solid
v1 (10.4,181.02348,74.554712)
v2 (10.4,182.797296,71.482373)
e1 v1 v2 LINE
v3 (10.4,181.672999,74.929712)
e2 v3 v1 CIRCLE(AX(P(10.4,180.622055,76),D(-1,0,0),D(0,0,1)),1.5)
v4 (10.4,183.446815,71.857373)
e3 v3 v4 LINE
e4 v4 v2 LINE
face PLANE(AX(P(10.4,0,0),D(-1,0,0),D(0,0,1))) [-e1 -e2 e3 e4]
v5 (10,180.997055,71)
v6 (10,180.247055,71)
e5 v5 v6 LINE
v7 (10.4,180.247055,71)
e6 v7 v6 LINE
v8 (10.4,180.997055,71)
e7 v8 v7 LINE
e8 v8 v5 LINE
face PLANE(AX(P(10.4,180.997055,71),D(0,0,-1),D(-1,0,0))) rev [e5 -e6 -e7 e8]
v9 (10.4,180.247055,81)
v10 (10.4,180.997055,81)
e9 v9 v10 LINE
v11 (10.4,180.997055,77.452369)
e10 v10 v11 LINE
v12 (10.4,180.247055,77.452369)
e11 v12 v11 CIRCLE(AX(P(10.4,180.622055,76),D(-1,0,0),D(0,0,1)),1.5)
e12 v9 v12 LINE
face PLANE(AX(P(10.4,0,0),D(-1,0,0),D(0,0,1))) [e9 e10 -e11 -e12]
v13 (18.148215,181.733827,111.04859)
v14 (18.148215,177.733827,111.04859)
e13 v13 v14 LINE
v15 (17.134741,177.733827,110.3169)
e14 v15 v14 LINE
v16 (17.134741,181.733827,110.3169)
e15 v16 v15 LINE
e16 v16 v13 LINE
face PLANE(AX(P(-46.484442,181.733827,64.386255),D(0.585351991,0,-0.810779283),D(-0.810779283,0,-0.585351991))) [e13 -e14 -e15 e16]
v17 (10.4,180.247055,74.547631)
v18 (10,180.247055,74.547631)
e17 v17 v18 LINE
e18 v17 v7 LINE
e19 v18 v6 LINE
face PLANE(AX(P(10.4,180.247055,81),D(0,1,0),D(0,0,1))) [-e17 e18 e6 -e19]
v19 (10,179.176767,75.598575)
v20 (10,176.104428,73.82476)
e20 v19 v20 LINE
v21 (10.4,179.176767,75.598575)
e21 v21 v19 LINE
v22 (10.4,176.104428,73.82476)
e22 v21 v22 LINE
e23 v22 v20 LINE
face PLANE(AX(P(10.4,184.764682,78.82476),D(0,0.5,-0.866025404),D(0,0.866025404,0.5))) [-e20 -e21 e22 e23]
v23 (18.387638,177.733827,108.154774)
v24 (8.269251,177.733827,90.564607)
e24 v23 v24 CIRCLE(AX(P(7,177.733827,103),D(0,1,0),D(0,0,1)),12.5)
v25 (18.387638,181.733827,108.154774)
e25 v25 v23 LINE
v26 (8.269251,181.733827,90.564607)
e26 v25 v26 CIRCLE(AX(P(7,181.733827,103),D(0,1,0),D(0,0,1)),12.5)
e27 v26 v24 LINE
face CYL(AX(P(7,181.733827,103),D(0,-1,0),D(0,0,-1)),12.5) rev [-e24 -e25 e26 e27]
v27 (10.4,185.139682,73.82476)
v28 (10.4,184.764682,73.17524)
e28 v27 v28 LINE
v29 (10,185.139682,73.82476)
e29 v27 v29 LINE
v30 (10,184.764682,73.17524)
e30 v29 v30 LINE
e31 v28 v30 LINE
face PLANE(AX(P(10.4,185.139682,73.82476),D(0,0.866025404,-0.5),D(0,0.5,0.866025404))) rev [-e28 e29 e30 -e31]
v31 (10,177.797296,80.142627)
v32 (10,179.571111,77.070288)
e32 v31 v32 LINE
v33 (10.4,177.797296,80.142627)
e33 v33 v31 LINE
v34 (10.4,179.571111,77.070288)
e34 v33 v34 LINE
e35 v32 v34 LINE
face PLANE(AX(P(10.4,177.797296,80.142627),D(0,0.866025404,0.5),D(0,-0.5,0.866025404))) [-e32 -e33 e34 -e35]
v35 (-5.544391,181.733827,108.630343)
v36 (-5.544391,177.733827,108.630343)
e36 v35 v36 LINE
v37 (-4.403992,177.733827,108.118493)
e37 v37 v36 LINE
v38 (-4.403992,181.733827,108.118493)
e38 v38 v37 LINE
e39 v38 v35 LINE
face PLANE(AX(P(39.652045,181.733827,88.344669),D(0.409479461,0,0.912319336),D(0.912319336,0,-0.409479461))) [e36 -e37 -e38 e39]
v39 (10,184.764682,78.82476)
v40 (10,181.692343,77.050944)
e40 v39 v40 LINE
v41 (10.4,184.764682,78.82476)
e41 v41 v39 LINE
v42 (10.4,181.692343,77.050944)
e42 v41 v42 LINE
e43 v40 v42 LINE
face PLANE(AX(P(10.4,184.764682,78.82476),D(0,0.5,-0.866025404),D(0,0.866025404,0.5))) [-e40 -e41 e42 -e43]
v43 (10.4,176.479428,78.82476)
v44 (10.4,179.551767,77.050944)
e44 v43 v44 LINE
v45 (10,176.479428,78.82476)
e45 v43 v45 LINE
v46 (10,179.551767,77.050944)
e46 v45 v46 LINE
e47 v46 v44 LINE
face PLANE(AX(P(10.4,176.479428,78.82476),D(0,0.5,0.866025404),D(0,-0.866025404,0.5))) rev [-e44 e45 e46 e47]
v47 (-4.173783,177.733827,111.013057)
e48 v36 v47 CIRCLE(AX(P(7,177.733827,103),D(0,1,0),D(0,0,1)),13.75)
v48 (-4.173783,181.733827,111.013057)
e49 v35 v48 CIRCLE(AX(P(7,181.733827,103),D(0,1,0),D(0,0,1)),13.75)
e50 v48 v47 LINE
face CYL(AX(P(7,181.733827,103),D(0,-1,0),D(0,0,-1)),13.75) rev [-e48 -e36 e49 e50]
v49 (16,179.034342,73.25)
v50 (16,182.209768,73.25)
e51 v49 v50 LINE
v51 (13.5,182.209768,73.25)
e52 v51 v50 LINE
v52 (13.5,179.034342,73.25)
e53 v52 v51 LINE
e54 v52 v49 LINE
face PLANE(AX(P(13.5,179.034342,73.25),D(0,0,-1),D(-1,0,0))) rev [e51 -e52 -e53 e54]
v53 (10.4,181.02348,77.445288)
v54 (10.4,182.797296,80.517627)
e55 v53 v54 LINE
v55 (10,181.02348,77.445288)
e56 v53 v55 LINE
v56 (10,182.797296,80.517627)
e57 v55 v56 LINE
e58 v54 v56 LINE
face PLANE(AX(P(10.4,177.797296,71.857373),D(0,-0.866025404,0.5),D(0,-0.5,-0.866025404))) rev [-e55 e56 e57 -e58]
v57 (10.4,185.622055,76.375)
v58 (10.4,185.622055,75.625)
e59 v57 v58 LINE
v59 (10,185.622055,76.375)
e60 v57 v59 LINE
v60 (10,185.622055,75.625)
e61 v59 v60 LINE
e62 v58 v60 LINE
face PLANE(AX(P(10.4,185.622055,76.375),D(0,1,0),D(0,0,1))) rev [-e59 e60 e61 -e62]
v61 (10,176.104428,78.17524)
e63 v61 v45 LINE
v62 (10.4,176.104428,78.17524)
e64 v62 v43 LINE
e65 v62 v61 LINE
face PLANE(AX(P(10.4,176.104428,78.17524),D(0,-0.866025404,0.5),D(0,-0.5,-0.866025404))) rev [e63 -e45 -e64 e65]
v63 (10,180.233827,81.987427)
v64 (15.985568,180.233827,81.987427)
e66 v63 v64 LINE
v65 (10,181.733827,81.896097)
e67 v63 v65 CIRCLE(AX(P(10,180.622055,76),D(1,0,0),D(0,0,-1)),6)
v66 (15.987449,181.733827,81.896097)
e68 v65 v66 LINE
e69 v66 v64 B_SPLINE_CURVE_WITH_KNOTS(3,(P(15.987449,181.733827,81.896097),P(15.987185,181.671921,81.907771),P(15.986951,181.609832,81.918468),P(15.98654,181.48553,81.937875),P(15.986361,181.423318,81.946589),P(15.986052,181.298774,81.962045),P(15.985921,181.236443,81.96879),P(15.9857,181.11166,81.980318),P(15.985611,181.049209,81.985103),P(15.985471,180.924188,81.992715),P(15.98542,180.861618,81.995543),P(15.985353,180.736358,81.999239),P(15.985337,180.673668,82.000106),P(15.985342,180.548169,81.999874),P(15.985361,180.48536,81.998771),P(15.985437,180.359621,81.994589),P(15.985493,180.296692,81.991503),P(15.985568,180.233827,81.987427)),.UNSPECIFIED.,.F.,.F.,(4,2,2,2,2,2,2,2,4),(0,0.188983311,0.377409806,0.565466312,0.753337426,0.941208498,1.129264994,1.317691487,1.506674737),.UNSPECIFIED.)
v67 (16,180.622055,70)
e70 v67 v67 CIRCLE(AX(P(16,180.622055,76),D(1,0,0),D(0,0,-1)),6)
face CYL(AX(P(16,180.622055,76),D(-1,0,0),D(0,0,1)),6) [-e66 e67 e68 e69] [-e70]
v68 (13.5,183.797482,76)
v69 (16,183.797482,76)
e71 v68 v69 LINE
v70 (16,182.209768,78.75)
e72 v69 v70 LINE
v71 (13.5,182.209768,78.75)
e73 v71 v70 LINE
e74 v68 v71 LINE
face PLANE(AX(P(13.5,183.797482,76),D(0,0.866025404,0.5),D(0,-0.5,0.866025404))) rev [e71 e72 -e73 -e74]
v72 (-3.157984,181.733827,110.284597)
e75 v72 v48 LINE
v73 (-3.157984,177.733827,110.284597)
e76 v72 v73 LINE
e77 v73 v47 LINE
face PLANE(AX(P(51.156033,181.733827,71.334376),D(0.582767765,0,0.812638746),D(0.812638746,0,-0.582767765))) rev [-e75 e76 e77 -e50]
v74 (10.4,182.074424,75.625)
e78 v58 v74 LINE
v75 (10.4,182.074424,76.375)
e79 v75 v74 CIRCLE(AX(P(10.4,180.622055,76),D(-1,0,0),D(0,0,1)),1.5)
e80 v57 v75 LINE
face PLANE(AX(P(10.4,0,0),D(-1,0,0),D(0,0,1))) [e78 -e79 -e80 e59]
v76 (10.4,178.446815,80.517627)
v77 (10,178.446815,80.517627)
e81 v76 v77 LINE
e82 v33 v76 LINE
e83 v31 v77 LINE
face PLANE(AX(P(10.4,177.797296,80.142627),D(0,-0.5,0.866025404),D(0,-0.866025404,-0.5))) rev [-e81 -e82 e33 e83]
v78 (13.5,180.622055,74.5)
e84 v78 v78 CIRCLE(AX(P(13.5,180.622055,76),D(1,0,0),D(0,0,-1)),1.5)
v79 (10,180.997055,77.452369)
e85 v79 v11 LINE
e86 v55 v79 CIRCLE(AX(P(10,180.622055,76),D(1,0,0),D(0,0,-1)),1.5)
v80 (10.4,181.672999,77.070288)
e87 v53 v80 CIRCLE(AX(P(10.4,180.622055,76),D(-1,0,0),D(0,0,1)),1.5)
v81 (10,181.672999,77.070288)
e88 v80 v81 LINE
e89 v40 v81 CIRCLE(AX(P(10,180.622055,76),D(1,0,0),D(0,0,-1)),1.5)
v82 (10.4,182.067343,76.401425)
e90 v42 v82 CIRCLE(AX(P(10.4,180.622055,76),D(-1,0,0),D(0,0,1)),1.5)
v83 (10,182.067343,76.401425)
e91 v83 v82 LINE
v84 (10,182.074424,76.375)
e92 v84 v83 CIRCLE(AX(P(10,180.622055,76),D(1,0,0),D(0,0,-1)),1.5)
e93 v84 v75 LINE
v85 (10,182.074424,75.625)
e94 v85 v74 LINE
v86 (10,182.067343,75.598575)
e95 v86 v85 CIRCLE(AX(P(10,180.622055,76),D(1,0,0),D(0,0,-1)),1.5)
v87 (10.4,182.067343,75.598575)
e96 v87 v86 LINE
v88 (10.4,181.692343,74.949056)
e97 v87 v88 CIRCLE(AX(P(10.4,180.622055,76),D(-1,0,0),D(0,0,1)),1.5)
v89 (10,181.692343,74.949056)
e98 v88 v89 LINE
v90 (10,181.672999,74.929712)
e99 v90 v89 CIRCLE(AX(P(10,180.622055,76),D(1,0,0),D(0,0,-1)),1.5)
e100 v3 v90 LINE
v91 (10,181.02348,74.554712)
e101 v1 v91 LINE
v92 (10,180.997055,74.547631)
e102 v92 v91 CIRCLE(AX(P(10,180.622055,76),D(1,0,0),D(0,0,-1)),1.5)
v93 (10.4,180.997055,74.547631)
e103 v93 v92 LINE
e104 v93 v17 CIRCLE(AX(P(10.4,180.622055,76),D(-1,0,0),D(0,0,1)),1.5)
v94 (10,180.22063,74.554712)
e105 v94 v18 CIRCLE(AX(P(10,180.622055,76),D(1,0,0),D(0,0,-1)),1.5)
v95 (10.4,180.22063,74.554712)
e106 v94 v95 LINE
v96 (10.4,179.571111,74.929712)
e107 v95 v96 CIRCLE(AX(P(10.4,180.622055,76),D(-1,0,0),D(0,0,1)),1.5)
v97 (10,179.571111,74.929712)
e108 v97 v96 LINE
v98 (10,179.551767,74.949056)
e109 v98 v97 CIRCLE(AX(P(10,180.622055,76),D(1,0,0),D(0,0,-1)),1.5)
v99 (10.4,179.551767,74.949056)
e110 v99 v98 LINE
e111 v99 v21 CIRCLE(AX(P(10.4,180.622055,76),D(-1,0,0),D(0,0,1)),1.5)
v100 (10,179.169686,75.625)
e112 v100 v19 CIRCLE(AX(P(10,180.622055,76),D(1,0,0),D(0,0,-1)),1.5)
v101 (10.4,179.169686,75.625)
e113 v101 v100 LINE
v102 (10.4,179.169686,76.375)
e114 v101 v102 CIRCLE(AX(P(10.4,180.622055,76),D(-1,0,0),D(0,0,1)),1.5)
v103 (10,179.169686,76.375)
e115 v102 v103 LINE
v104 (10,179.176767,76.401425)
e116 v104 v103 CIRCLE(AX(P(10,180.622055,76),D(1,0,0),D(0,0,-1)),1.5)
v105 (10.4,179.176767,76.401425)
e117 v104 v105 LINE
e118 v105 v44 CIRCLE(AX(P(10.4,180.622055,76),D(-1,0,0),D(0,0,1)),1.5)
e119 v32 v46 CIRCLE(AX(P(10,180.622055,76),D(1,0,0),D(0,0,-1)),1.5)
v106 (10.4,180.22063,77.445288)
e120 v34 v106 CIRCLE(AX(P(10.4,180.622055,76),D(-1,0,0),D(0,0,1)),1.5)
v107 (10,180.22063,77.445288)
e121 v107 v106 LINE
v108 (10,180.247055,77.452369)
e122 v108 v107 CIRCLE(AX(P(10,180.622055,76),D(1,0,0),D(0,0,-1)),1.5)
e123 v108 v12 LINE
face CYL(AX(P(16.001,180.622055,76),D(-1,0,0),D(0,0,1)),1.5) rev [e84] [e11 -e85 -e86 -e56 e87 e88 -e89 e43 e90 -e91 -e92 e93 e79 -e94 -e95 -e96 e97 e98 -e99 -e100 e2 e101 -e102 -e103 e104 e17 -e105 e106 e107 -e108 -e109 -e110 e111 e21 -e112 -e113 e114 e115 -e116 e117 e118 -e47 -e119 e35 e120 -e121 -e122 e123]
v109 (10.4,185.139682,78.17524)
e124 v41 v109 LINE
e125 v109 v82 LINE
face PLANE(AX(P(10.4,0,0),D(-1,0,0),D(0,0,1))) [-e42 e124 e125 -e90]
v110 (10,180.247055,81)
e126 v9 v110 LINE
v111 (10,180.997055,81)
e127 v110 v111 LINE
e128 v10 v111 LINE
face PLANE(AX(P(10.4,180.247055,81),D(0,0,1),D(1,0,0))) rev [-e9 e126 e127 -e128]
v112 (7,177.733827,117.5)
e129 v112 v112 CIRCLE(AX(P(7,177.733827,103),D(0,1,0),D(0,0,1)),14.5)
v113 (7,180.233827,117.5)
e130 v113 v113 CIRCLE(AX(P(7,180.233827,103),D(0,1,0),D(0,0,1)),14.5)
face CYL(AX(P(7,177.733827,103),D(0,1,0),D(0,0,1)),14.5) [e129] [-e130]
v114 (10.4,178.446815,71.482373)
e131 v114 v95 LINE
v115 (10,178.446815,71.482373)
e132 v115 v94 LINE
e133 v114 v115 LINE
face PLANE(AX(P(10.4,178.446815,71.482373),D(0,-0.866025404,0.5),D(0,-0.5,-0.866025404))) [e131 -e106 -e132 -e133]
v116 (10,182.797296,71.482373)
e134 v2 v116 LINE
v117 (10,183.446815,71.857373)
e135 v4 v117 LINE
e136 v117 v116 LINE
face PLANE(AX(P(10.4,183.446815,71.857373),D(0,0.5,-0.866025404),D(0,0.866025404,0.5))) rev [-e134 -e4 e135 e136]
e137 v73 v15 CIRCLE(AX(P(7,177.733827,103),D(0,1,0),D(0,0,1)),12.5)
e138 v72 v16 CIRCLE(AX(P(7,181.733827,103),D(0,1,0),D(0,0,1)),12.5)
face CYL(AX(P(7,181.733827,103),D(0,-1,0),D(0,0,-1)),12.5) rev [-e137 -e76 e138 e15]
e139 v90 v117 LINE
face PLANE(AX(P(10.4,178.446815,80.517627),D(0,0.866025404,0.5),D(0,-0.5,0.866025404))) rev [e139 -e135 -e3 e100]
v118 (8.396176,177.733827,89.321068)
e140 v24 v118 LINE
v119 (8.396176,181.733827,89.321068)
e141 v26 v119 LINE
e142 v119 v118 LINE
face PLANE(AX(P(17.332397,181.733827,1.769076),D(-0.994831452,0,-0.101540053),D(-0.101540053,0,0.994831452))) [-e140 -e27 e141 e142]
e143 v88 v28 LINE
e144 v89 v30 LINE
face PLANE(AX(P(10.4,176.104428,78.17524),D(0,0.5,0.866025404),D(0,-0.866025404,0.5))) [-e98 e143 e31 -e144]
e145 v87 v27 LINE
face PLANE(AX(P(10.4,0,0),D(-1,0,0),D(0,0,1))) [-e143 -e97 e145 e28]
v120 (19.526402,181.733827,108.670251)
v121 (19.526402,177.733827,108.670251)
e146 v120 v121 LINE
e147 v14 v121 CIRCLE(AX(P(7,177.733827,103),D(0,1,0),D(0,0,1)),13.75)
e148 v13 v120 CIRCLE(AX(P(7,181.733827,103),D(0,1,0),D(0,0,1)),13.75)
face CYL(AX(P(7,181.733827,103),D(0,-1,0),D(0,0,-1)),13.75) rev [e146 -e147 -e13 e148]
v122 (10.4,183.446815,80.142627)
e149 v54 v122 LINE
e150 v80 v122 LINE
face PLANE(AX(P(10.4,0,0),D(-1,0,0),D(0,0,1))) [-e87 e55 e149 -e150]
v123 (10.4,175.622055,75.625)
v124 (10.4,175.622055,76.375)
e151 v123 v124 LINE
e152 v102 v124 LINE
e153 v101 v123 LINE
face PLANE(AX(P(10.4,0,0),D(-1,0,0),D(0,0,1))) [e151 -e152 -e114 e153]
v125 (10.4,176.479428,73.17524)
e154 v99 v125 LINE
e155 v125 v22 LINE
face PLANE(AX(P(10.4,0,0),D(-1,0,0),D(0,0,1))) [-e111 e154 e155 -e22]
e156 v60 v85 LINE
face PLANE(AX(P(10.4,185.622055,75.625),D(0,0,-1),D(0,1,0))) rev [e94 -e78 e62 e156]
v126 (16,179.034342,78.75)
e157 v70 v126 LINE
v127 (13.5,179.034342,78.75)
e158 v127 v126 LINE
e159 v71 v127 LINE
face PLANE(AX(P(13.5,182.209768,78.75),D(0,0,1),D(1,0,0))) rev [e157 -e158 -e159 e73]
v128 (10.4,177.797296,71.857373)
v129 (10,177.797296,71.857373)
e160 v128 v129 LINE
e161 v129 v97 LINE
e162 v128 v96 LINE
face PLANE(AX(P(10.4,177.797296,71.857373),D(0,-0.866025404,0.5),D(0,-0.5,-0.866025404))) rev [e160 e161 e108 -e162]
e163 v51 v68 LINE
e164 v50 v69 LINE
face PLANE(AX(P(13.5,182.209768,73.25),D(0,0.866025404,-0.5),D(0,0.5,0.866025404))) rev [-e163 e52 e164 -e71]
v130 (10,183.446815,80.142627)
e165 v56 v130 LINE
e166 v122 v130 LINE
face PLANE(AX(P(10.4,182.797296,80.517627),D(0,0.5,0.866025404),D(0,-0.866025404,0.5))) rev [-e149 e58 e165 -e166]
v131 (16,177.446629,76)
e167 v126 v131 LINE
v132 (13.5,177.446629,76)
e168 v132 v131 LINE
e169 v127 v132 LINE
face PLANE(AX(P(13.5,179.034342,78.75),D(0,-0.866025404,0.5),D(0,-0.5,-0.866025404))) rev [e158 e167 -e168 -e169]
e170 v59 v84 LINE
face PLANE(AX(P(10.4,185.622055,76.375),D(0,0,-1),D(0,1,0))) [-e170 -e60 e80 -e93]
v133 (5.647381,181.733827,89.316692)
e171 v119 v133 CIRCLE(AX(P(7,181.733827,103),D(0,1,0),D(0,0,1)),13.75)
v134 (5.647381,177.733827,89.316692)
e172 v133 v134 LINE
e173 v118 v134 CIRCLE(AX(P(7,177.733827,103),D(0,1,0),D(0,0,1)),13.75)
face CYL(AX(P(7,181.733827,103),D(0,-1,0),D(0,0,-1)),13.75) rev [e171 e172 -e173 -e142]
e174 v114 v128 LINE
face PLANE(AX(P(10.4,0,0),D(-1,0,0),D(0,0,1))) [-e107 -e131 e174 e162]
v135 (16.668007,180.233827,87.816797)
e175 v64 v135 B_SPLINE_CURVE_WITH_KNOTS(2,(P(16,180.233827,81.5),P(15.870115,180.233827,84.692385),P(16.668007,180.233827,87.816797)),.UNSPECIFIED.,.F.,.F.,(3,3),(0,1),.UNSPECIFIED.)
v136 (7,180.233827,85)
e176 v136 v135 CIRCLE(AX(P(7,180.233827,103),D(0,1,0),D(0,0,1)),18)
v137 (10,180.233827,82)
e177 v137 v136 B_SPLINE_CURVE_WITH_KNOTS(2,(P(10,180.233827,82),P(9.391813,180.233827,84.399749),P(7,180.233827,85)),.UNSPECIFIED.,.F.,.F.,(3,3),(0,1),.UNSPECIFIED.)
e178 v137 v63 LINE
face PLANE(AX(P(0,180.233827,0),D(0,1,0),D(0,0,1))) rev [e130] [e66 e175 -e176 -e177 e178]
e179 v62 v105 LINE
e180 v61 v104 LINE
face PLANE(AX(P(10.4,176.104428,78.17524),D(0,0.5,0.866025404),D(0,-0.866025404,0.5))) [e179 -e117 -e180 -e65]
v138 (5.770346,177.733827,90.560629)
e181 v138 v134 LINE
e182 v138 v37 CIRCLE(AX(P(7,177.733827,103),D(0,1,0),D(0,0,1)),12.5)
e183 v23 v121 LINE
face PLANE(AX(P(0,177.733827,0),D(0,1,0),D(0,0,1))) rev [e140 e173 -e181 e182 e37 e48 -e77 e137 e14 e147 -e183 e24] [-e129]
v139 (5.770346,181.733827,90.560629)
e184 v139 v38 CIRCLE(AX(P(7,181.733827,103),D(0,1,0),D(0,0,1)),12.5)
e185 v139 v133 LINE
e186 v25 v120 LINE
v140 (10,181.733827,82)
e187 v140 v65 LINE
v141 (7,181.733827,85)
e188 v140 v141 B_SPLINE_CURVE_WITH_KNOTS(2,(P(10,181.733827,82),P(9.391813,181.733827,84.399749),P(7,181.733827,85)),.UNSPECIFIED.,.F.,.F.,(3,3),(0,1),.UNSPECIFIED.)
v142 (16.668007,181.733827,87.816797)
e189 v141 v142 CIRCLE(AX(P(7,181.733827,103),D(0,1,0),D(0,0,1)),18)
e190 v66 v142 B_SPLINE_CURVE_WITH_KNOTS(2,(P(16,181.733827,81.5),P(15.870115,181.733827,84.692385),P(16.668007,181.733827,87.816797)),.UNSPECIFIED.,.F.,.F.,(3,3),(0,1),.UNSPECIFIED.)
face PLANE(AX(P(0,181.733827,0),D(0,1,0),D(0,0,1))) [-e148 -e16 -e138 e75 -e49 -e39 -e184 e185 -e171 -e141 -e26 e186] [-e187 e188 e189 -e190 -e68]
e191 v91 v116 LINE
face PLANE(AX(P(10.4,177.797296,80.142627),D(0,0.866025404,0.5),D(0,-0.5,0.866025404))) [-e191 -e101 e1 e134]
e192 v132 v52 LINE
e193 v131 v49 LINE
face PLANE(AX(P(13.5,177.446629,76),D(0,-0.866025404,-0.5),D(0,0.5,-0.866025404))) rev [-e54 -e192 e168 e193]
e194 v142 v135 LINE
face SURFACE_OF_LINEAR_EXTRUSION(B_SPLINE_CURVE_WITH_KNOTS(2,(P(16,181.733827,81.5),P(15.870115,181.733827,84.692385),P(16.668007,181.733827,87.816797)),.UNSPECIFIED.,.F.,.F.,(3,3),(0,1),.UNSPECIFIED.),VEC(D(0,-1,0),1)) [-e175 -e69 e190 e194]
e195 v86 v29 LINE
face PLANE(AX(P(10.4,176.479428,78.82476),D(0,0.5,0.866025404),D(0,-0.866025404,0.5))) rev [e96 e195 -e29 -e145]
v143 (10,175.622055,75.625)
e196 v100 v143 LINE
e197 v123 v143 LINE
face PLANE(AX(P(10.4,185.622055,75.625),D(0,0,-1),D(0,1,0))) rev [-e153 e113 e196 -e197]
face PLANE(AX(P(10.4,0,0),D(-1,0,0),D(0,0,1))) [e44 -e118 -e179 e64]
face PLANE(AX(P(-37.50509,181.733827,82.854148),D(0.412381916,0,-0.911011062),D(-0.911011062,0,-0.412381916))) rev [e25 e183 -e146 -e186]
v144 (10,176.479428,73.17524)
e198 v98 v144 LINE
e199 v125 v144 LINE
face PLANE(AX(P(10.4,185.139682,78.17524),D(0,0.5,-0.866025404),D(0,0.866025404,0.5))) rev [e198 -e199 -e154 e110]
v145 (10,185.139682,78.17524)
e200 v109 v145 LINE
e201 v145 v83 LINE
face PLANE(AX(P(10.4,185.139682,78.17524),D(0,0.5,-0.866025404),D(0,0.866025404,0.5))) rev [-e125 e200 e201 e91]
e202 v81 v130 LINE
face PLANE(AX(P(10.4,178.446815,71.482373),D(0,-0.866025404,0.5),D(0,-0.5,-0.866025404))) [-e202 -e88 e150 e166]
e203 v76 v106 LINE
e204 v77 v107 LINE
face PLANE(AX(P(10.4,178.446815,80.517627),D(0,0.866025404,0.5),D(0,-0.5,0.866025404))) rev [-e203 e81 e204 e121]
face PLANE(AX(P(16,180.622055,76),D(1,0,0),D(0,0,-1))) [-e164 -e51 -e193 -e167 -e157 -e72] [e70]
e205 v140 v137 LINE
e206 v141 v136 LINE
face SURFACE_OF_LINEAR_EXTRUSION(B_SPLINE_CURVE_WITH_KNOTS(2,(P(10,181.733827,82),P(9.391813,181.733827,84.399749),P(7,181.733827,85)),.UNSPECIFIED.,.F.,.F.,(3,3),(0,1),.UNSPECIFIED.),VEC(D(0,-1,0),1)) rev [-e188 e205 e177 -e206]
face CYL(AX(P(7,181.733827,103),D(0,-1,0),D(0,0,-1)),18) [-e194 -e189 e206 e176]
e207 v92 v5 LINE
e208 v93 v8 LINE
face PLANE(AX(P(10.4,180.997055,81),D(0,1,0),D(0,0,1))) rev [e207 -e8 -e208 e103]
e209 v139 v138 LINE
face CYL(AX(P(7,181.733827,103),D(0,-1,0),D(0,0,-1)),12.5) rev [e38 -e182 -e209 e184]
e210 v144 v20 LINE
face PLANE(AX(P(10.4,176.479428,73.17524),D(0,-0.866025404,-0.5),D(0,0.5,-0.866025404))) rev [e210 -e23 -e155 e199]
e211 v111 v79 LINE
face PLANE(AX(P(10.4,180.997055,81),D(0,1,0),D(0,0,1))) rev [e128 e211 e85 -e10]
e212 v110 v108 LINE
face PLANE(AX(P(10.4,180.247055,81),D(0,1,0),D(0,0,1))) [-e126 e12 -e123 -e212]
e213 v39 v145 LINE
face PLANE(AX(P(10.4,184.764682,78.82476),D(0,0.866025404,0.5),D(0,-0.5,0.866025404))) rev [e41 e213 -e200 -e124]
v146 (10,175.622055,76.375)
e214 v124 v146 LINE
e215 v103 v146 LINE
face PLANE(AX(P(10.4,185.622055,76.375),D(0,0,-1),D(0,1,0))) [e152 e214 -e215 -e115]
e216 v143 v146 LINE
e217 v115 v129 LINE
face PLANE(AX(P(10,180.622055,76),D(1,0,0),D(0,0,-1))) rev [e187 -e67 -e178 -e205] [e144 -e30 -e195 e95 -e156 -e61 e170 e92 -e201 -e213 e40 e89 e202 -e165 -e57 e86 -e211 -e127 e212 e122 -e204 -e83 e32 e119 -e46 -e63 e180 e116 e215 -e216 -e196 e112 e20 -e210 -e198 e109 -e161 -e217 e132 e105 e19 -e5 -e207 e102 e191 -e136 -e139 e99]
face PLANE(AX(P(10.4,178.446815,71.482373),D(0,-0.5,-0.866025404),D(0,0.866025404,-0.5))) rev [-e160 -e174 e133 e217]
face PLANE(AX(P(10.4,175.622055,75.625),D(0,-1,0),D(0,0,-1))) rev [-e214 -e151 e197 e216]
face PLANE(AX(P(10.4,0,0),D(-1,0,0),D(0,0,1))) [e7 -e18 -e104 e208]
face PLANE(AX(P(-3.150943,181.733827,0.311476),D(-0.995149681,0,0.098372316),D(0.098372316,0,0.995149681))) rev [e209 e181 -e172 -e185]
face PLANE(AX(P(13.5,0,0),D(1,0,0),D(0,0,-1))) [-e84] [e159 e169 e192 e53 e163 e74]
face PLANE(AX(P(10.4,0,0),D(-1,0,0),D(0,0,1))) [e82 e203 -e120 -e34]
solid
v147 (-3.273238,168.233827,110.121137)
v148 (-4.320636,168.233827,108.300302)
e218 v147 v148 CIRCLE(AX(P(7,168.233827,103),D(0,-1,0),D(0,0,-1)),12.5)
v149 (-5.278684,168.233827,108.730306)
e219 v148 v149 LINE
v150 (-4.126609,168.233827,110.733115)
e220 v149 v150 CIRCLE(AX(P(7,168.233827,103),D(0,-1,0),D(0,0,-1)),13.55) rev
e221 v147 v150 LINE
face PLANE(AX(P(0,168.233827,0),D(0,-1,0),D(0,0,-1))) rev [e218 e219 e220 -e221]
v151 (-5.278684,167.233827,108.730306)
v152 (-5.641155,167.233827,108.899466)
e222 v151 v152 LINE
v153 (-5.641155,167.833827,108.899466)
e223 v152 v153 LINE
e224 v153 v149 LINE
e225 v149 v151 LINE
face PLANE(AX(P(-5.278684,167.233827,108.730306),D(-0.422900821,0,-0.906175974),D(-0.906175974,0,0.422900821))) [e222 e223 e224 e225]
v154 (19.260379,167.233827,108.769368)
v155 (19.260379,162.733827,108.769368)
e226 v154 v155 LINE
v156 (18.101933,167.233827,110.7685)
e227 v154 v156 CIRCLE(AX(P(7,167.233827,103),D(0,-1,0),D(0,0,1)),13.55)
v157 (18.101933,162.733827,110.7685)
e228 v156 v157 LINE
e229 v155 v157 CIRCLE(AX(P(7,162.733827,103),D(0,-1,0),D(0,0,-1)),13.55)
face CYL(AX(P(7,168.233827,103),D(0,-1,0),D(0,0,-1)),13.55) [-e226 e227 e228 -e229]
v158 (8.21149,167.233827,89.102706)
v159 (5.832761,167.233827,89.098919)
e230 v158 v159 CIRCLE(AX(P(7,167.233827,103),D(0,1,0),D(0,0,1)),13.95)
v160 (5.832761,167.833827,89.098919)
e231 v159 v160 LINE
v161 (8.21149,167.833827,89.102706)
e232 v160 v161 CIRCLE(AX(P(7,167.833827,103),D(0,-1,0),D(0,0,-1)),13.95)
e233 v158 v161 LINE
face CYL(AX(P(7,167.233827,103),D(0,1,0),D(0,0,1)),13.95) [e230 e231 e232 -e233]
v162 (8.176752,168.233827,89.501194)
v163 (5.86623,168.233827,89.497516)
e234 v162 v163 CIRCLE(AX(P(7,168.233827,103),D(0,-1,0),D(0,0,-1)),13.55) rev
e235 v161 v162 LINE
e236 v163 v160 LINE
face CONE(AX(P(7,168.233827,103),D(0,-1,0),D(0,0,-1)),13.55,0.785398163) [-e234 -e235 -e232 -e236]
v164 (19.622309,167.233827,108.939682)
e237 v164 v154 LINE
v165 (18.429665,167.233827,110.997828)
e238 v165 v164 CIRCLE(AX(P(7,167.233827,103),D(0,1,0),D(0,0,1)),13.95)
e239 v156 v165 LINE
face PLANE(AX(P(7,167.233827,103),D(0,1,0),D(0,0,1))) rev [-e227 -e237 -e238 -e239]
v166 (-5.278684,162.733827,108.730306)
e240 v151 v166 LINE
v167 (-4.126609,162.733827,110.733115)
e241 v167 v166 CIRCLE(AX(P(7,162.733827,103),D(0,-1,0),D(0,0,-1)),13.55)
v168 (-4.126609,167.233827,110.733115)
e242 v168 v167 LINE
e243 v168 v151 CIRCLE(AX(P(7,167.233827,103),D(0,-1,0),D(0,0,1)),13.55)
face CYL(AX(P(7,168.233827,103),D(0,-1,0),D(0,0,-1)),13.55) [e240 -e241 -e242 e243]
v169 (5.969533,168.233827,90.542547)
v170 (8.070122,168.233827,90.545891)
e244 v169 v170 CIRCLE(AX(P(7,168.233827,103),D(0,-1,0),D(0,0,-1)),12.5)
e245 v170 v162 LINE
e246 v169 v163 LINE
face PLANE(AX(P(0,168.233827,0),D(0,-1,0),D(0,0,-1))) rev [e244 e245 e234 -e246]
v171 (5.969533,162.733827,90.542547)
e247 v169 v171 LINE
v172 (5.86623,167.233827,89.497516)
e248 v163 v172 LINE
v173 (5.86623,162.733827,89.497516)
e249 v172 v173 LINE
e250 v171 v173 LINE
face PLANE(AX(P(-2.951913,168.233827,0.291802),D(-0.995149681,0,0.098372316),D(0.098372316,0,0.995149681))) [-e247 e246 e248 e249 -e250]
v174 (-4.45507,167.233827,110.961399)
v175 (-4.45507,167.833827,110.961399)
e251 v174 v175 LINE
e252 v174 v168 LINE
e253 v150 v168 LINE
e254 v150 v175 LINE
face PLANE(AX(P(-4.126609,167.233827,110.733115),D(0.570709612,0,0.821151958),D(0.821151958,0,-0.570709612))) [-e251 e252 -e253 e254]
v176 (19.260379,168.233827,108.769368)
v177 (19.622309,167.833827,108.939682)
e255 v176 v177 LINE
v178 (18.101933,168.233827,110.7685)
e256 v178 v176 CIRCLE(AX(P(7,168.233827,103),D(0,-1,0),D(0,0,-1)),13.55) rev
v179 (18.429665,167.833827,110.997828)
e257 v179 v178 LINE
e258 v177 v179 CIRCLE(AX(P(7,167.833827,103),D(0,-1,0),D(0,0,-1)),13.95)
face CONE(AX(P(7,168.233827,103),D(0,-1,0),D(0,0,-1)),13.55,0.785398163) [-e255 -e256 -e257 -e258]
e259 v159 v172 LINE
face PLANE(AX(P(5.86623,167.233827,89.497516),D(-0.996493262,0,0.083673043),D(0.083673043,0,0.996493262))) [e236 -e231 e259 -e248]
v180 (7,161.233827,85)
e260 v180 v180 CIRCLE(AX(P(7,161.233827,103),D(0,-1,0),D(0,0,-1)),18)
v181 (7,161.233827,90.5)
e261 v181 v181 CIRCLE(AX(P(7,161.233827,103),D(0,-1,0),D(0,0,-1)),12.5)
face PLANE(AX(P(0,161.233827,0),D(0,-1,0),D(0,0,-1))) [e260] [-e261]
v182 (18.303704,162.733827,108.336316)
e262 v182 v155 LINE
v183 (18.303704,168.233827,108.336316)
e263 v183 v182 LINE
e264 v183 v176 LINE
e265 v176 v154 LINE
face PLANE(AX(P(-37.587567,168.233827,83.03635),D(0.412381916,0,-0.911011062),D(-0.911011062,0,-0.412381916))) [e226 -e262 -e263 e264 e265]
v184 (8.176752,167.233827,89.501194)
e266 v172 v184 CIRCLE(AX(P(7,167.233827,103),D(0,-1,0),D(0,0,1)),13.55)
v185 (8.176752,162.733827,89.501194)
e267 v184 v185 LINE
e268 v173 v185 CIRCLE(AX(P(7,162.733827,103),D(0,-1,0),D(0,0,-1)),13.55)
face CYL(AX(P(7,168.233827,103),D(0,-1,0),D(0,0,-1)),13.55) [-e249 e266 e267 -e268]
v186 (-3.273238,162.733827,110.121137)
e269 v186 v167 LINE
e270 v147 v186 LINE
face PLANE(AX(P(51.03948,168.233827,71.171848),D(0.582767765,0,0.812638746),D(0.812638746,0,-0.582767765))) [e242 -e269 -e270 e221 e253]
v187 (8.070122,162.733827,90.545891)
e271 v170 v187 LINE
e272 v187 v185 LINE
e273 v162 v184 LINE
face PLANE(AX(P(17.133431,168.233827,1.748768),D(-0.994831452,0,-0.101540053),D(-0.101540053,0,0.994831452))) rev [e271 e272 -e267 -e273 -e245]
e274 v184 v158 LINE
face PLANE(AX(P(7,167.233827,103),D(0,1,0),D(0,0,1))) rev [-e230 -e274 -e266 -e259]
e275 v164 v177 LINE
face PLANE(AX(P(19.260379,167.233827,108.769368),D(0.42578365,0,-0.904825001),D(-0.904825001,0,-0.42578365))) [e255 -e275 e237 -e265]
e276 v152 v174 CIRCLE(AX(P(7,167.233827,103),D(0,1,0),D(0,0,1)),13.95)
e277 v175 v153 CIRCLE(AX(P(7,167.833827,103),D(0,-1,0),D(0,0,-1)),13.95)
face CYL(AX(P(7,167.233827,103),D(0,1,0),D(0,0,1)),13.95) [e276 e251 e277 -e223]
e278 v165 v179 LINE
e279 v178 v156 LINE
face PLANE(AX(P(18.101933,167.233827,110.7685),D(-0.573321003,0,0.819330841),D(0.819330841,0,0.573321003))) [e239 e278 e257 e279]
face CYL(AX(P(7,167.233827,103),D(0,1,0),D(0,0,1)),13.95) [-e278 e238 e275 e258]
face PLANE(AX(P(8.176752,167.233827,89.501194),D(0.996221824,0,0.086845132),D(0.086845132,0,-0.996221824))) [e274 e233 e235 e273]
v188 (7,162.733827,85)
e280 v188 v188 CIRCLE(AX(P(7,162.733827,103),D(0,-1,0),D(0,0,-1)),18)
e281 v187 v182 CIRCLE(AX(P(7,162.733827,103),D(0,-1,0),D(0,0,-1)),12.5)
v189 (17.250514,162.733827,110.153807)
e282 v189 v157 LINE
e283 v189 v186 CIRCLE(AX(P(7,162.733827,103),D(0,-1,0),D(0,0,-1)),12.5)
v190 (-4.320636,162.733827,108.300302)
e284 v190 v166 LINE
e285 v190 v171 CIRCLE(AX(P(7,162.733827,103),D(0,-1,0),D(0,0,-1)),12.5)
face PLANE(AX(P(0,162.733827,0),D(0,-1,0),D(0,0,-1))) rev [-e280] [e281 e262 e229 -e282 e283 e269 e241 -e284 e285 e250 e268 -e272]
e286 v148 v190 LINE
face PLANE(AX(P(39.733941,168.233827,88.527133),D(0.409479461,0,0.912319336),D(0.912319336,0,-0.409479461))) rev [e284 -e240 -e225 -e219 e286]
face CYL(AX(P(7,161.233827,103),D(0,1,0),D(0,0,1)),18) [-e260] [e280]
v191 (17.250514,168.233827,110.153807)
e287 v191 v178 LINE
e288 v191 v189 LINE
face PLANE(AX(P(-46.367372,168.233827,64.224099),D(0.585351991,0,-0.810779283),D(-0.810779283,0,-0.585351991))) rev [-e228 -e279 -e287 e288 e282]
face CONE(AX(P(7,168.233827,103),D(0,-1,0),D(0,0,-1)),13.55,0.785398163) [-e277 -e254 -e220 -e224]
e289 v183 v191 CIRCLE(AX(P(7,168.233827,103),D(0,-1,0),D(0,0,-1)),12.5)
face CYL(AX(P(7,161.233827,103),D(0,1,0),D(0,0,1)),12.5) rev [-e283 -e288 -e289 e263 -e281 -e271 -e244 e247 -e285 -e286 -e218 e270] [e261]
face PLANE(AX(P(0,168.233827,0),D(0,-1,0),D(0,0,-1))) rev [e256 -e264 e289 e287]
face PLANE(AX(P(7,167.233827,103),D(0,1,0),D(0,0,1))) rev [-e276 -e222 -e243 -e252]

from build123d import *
from build123d.topology import SkipClean

# Parameters (mm, degrees)
ESBO_O120_R                = 6
RESSALTO_EXTRUS_O39_DEPTH  = 6
ESBO_O120_3_W              = 10
ESBO_O120_3_H              = 0.75
ESBO_O120_3_W_2            = 0.75
ESBO_O120_3_H_2            = 10
CORTE_EXTRUS_O_FINA1_DEPTH = 0.4
CORTE_EXTRUS_O49_REACH     = 205.931
ESBO_O120_4_R              = 1.5
CORTE_EXTRUS_O50_DEPTH     = 2.5
RESSALTO_EXTRUS_O40_DEPTH  = 1.5
RESSALTO_EXTRUS_O41_START  = -2.5
ESBO_O122_12_R             = 14.5
RESSALTO_EXTRUS_O41_DEPTH  = 2.5
ESBO_O123_R                = 18
ESBO_O123_R_2              = 12.5
RESSALTO_EXTRUS_O42_DEPTH  = 1.5
RESSALTO_EXTRUS_O43_DEPTH  = 5.5
RESSALTO_EXTRUS_O44_DEPTH  = 1
CHANFRO1_SIZE              = 0.4


with BuildPart() as part:
    # Esboço120 → Ressalto-extrusão39 (new body)
    with BuildSketch(Plane(origin=(10, 0, 0), x_dir=(0, 0, -1), z_dir=(1, 0, 0))):
        with Locations((-76, 180.622055231)):
            Circle(ESBO_O120_R)
    extrude(amount=RESSALTO_EXTRUS_O39_DEPTH)

    # Esboço120<3> → Corte-Extrusão-Fina1 (cut)
    with BuildSketch(Plane(origin=(10, 0, 0), x_dir=(0, 0, -1), z_dir=(1, 0, 0))):
        Polygon((-78.824759526, 184.76468225), (-73.824759526, 176.104428212), (-73.175240474, 176.479428212), (-78.175240474, 185.13968225), align=None)
        Polygon((-78.175240474, 176.104428212), (-73.175240474, 184.76468225), (-73.824759526, 185.13968225), (-78.824759526, 176.479428212), align=None)
        Polygon((-80.142627019, 177.797295704), (-71.482372981, 182.797295704), (-71.857372981, 183.446814757), (-80.517627019, 178.446814757), align=None)
        with Locations((-76, 180.622055231)):
            Rectangle(ESBO_O120_3_W, ESBO_O120_3_H)
        Polygon((-71.482372981, 178.446814757), (-80.142627019, 183.446814757), (-80.517627019, 182.797295704), (-71.857372981, 177.797295704), align=None)
        with Locations((-76, 180.622055231)):
            Rectangle(ESBO_O120_3_W_2, ESBO_O120_3_H_2)
    extrude(amount=CORTE_EXTRUS_O_FINA1_DEPTH, mode=Mode.SUBTRACT)

    # Esboço120<4> → Corte-extrusão49 (cut, up to next)
    with BuildSketch(Plane(origin=(10, 0, 0), x_dir=(0, 0, -1), z_dir=(1, 0, 0)), mode=Mode.PRIVATE) as corte_extrus_o49_sk1:
        with Locations(Location((-76, 180.622055231, 0), (0, 0, 165.522487814))):
            Circle(ESBO_O120_4_R)
    corte_extrus_o49_tool1 = extrude(corte_extrus_o49_sk1.sketch, amount=CORTE_EXTRUS_O49_REACH, mode=Mode.PRIVATE) & part.part
    add(corte_extrus_o49_tool1.solids().sort_by_distance((10, 180.622055, 76))[0], mode=Mode.SUBTRACT)

    # Esboço121 → Corte-extrusão50 (cut)
    with BuildSketch(Plane(origin=(16, 0, 0), x_dir=(0, 0, -1), z_dir=(1, 0, 0))):
        Polygon((-76, 183.797481711), (-78.75, 182.209768471), (-78.75, 179.03434199), (-76, 177.44662875), (-73.25, 179.03434199), (-73.25, 182.209768471), align=None)
    extrude(amount=-CORTE_EXTRUS_O50_DEPTH, mode=Mode.SUBTRACT)

    # Esboço122 → Ressalto-extrusão40 (add)
    with BuildSketch(Plane(origin=(0, 180.233826663, 0), x_dir=(1, 0, 0), z_dir=(0, 1, 0))):
        with BuildLine():
            Line((10, -81.5), (10, -82))
            add(Edge.make_bspline(
                [(10, -82), (9.391813157, -84.399749478), (7, -85)],
                knots=[0, 0, 0, 1, 1, 1], degree=2))
            ThreePointArc((7, -85), (1.965005041, -120.281459017), (16.66800656, -87.816797138))
            add(Edge.make_bspline(
                [(16, -81.5), (15.870115204, -84.692384764), (16.66800656, -87.816797138)],
                knots=[0, 0, 0, 1, 1, 1], degree=2))
            Line((16, -81.5), (10, -81.5))
        make_face()
        with BuildLine():
            ThreePointArc((8.26925066, -90.564606851), (17.835252837, -96.767240101), (18.387638276, -108.154773952))
            Line((18.387638276, -108.154773952), (19.526402104, -108.670251347))
            ThreePointArc((19.526402104, -108.670251347), (18.896890309, -109.89394669), (18.148215147, -111.048589879))
            Line((18.148215147, -111.048589879), (17.134741043, -110.31689989))
            ThreePointArc((17.134741043, -110.31689989), (6.98010199, -115.499984163), (-3.157984331, -110.28459706))
            Line((-3.157984331, -110.28459706), (-4.173782764, -111.013056766))
            ThreePointArc((-4.173782764, -111.013056766), (-4.918778121, -109.856035889), (-5.544390873, -108.630342585))
            Line((-5.544390873, -108.630342585), (-4.403991703, -108.118493259))
            ThreePointArc((-4.403991703, -108.118493259), (-3.815354827, -96.732775736), (5.770346055, -90.560628988))
            Line((5.770346055, -90.560628988), (5.64738066, -89.316691887))
            ThreePointArc((5.64738066, -89.316691887), (7.021887811, -89.250017421), (8.396175726, -89.321067537))
            Line((8.396175726, -89.321067537), (8.26925066, -90.564606851))
        make_face(mode=Mode.SUBTRACT)
    extrude(amount=RESSALTO_EXTRUS_O40_DEPTH)

    # Esboço122<12> → Ressalto-extrusão41 (add)
    with BuildSketch(Plane(origin=(0, 180.233826663, 0), x_dir=(1, 0, 0), z_dir=(0, 1, 0)).offset(RESSALTO_EXTRUS_O41_START)):
        with Locations(Location((7, -103, 0), (0, 0, 270))):
            Circle(ESBO_O122_12_R)
        with BuildLine():
            Line((8.396175726, -89.321067537), (8.26925066, -90.564606851))
            ThreePointArc((8.26925066, -90.564606851), (16.276735235, -94.621922454), (19.5, -103))
            ThreePointArc((19.5, -103), (19.218745403, -105.636714011), (18.387638276, -108.154773952))
            Line((18.387638276, -108.154773952), (19.526402104, -108.670251347))
            ThreePointArc((19.526402104, -108.670251347), (18.896890309, -109.89394669), (18.148215147, -111.048589879))
            Line((18.148215147, -111.048589879), (17.134741043, -110.31689989))
            ThreePointArc((17.134741043, -110.31689989), (6.98010199, -115.499984163), (-3.157984331, -110.28459706))
            Line((-3.157984331, -110.28459706), (-4.173782764, -111.013056766))
            ThreePointArc((-4.173782764, -111.013056766), (-4.918778121, -109.856035889), (-5.544390873, -108.630342585))
            Line((-5.544390873, -108.630342585), (-4.403991703, -108.118493259))
            ThreePointArc((-4.403991703, -108.118493259), (-3.815354827, -96.732775736), (5.770346055, -90.560628988))
            Line((5.770346055, -90.560628988), (5.64738066, -89.316691887))
            ThreePointArc((5.64738066, -89.316691887), (7.021887811, -89.250017421), (8.396175726, -89.321067537))
        make_face(mode=Mode.SUBTRACT)
    extrude(amount=RESSALTO_EXTRUS_O41_DEPTH)


with BuildPart() as body_2:
    # Esboço123 → Ressalto-extrusão42 (new body)
    with BuildSketch(Plane(origin=(0, 162.733826663, 0), x_dir=(-1, 0, 0), z_dir=(0, -1, 0))):
        with Locations(Location((-7, -103, 0), (0, 0, 90))):
            Circle(ESBO_O123_R)
        with Locations(Location((-7, -103, 0), (0, 0, 90))):
            Circle(ESBO_O123_R_2, mode=Mode.SUBTRACT)
    extrude(amount=RESSALTO_EXTRUS_O42_DEPTH)

    # Esboço123<3> → Ressalto-extrusão43 (add)
    with SkipClean():  # the faces are left unmerged after this step: merging them gives an invalid solid
        with BuildSketch(Plane(origin=(0, 162.733826663, 0), x_dir=(-1, 0, 0), z_dir=(0, -1, 0))):
            with BuildLine():
                ThreePointArc((-17.250514111, -110.15380741), (-17.815354827, -109.267224264), (-18.303704182, -108.336316311))
                Line((-18.303704182, -108.336316311), (-19.260378769, -108.769368461))
                ThreePointArc((-19.260378769, -108.769368461), (-18.723844632, -109.793671102), (-18.101932901, -110.768499589))
                Line((-18.101932901, -110.768499589), (-17.250514111, -110.15380741))
            make_face()
            with BuildLine():
                Line((5.278684444, -108.730306129), (4.320636006, -108.300301917))
                ThreePointArc((4.320636006, -108.300301917), (3.835252837, -109.232759899), (3.273237579, -110.121136823))
                Line((3.273237579, -110.121136823), (4.126609036, -110.733115243))
                ThreePointArc((4.126609036, -110.733115243), (4.745414075, -109.75631173), (5.278684444, -108.730306129))
            make_face()
            with BuildLine():
                Line((-8.176751543, -89.501194282), (-8.070121896, -90.545890673))
                ThreePointArc((-8.070121896, -90.545890673), (-7.01989801, -90.500015837), (-5.969533397, -90.542546866))
                Line((-5.969533397, -90.542546866), (-5.866230267, -89.497516295))
                ThreePointArc((-5.866230267, -89.497516295), (-7.021569443, -89.450017168), (-8.176751543, -89.501194282))
            make_face()
        extrude(amount=-RESSALTO_EXTRUS_O43_DEPTH)

    # Esboço124 → Ressalto-extrusão44 (add)
    with SkipClean():  # the faces are left unmerged after this step: merging them gives an invalid solid
        with BuildSketch(Plane(origin=(0, 168.233826663, 0), x_dir=(1, 0, 0), z_dir=(0, 1, 0))):
            with BuildLine():
                Line((18.101932901, -110.768499589), (18.429665238, -110.99782799))
                ThreePointArc((18.429665238, -110.99782799), (19.069935987, -109.994222278), (19.62230877, -108.939681921))
                Line((19.62230877, -108.939681921), (19.260378769, -108.769368461))
                ThreePointArc((19.260378769, -108.769368461), (18.723844632, -109.793671102), (18.101932901, -110.768499589))
            make_face()
            with BuildLine():
                Line((8.176751543, -89.501194282), (8.211489596, -89.102705553))
                ThreePointArc((8.211489596, -89.102705553), (7.02220618, -89.050017674), (5.832761049, -89.098918991))
                Line((5.832761049, -89.098918991), (5.866230267, -89.497516295))
                ThreePointArc((5.866230267, -89.497516295), (7.021569443, -89.450017168), (8.176751543, -89.501194282))
            make_face()
            with BuildLine():
                Line((-5.278684444, -108.730306129), (-5.641154833, -108.899466458))
                ThreePointArc((-5.641154833, -108.899466458), (-5.092142166, -109.955760047), (-4.455069819, -110.961399088))
                Line((-4.455069819, -110.961399088), (-4.126609036, -110.733115243))
                ThreePointArc((-4.126609036, -110.733115243), (-4.745414075, -109.75631173), (-5.278684444, -108.730306129))
            make_face()
        extrude(amount=-RESSALTO_EXTRUS_O44_DEPTH)

    # Chanfro1
    chanfro1_edges = [body_2.edges().sort_by_distance(p)[0] for p in [
        (19.069935987, 168.233826663, 109.994222278),
        (-5.092142166, 168.233826663, 109.955760047),
        (7.02220618, 168.233826663, 89.050017674),
    ]]
    chamfer(chanfro1_edges, length=CHANFRO1_SIZE - 0.0001)  # a hair under: the kernel refuses the full size


solid = Compound([part.part, body_2.part])
